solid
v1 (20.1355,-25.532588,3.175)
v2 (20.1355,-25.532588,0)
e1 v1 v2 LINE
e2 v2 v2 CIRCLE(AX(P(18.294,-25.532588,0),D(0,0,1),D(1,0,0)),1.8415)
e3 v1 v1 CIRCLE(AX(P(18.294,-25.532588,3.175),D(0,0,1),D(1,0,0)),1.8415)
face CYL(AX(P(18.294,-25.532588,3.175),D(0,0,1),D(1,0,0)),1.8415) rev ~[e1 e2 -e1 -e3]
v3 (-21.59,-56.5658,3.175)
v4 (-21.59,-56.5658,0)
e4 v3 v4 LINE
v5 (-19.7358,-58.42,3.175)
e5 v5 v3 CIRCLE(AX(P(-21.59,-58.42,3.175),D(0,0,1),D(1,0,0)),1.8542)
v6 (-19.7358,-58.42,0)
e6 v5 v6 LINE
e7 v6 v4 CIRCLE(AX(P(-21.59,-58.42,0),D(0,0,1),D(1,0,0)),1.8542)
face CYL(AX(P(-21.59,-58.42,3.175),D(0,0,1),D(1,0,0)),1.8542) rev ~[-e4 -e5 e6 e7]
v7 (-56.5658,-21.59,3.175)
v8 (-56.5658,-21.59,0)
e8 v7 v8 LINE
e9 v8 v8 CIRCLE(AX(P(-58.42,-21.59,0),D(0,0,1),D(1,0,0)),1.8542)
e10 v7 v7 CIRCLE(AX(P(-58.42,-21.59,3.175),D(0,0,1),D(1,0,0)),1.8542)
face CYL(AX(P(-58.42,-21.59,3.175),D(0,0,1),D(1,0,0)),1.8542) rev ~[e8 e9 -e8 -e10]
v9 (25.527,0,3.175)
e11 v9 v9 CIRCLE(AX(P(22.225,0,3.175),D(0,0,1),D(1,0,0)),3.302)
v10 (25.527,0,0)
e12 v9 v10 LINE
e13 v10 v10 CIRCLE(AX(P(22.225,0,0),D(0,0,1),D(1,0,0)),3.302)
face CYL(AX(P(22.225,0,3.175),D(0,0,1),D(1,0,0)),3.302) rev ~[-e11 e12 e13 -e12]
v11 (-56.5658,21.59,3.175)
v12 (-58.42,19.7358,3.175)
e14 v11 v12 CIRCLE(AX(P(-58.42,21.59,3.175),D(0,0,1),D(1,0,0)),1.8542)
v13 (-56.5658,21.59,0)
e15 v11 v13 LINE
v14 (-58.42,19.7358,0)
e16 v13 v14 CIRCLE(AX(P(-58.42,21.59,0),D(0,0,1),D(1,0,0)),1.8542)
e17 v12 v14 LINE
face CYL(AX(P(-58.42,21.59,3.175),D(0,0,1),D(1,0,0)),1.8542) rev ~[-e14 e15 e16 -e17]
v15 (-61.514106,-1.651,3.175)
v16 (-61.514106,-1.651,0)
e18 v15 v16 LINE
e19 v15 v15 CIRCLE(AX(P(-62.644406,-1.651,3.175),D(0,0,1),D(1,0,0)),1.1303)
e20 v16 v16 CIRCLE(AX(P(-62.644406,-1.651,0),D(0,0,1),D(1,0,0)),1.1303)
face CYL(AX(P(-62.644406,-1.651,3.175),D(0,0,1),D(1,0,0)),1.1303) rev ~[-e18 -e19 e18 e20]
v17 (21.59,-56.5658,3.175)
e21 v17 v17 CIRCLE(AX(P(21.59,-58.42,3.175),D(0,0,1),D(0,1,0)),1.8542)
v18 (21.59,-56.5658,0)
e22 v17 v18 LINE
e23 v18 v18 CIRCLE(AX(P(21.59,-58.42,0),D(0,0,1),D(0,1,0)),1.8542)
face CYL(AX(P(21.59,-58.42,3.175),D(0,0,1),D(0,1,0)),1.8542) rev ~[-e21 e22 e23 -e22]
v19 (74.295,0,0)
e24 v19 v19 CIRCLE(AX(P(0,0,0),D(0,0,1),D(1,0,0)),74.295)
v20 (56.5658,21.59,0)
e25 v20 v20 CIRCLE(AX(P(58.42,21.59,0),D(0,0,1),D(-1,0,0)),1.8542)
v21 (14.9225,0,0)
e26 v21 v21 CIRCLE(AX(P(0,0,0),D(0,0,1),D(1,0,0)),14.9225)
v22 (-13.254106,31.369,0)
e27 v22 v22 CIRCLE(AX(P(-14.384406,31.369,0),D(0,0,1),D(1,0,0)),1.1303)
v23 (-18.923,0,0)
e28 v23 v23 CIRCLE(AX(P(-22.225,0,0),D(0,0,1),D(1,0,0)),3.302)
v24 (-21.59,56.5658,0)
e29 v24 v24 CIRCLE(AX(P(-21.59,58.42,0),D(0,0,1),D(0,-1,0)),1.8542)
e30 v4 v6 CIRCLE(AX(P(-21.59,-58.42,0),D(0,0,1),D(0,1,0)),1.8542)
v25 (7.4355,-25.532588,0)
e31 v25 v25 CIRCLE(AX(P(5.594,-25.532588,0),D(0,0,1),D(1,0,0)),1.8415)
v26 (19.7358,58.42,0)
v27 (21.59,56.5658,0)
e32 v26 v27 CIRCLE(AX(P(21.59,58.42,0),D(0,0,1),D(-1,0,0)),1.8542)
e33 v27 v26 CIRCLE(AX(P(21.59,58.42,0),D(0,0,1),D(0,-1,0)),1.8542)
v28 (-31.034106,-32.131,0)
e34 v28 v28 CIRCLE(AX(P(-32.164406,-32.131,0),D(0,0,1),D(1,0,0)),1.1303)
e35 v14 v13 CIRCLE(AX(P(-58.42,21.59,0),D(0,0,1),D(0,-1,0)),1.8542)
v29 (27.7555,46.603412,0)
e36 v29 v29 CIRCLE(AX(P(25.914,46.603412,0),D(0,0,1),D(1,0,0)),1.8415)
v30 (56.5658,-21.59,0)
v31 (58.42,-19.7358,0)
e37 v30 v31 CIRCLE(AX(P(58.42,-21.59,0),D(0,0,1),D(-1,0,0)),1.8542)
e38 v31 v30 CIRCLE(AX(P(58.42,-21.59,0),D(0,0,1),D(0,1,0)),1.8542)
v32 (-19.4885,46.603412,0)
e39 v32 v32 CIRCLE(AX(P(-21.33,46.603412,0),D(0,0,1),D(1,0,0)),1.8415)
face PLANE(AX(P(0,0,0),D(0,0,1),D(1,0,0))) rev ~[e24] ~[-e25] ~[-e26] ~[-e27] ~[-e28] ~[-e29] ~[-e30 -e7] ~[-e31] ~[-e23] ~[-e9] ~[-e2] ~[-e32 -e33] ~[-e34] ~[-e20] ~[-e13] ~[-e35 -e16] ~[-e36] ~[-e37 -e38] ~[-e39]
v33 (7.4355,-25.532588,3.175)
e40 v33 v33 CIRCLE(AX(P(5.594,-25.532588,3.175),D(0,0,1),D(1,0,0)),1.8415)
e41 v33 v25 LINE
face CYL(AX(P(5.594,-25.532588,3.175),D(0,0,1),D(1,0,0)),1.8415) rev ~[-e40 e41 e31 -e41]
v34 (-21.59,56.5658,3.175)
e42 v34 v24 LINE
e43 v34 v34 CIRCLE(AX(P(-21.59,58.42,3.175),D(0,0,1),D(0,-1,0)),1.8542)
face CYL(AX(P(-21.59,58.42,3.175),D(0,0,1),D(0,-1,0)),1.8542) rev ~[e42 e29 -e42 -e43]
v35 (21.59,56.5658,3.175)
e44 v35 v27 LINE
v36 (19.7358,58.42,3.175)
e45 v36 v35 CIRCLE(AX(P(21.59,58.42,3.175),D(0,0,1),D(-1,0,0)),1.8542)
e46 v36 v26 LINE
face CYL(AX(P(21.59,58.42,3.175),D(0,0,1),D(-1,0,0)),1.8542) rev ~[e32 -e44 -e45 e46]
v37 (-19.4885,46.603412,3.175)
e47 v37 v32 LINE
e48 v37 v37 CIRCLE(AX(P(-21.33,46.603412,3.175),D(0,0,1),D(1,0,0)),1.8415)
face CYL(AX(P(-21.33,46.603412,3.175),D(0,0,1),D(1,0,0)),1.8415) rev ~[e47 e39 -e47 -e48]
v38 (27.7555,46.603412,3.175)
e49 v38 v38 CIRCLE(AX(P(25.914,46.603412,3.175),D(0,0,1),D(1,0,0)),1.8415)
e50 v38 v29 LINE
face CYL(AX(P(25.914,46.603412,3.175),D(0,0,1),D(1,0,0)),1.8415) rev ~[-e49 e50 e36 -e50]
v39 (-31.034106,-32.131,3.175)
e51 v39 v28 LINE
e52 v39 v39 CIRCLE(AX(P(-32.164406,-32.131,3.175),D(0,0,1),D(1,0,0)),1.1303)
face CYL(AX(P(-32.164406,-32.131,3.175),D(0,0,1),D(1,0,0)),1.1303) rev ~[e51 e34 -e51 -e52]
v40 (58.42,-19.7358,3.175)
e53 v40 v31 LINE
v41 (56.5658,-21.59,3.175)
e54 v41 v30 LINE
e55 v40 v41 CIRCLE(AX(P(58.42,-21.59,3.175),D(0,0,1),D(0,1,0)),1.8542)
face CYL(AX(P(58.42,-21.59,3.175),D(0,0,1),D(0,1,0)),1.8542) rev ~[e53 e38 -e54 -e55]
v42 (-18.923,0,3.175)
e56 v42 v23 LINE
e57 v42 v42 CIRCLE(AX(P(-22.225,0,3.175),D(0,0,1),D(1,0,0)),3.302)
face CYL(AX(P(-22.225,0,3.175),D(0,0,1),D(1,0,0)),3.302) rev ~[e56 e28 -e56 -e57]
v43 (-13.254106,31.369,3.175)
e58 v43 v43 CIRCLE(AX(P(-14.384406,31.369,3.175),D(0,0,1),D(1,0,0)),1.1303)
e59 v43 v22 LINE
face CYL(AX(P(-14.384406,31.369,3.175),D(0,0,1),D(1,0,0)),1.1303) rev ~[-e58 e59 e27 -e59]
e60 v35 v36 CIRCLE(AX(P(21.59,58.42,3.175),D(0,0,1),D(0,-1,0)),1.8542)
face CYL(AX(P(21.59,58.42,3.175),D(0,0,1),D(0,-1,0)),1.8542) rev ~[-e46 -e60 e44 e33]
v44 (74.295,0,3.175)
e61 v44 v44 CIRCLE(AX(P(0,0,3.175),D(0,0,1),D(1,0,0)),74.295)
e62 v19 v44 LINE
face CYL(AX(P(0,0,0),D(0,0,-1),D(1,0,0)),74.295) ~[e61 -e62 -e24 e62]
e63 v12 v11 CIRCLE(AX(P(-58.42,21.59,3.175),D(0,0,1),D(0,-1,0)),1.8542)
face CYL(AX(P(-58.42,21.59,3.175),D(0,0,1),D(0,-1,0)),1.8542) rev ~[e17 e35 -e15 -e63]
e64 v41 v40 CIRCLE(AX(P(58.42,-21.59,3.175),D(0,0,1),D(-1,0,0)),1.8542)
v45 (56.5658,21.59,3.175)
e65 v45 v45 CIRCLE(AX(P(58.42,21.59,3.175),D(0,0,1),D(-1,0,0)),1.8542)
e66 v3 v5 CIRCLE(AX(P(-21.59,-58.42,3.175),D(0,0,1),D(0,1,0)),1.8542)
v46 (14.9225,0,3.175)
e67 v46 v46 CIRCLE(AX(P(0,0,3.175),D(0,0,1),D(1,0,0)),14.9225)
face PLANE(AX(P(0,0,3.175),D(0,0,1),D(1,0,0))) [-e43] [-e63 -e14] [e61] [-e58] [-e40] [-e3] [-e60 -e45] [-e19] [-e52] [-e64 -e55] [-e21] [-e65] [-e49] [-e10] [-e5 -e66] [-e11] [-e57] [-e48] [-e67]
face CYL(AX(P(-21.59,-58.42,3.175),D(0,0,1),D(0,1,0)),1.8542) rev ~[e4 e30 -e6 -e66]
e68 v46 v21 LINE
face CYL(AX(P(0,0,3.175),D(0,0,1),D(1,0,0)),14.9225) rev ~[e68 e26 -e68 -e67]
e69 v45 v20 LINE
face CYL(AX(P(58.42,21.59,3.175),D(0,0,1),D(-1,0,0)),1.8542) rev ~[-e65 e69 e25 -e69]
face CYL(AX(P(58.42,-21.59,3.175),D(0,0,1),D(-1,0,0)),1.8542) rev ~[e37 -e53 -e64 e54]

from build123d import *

# Parameters (mm, degrees)
F0_R            = 74.295
F1_DEPTH        = 3.175
F2_R            = 1.8542
F3_DEPTH        = 3.176
F3_COPIES_COUNT = 4
F4_R            = 14.9225
F4_R_2          = 3.302
F5_DEPTH        = 3.176
F6_R            = 1.8415
F7_DEPTH        = 3.176
F8_R            = 1.1303
F9_DEPTH        = 3.176


# Not quite as in the source:
# - a pattern or mirror of a feature is missing from the dataset's text; its kind, count and spacing are read off the source's solid


with BuildPart() as f1:
    # F0 (on Top) → F1 (new body)
    with BuildSketch(Plane.XY):
        Circle(F0_R)
    extrude(amount=F1_DEPTH)

    # F2 (on face) → F3 (cut, through all)
    with BuildSketch(Plane.XY.offset(3.175)):
        with BuildLine():
            ThreePointArc((-58.42, 19.7358), (-57.1088826063, 20.2788826063), (-56.5658, 21.59))
            ThreePointArc((-56.5658, 21.59), (-59.7311173937, 22.9011173937), (-58.42, 19.7358))
        make_face()
        with Locations((-58.42, -21.59)):
            Circle(F2_R)
    f3 = extrude(amount=-F3_DEPTH, mode=Mode.SUBTRACT)

    # F3_copies: F3 ×4 about axis
    f3_copies_axis = Axis((0, 0, 0), (0, 0, 1))
    for i in range(1, F3_COPIES_COUNT):
        add(f3.rotate(f3_copies_axis, i * 360 / F3_COPIES_COUNT), mode=Mode.SUBTRACT)

    # F4 (on face) → F5 (cut, through all)
    with BuildSketch(Plane.XY.offset(3.175)):
        Circle(F4_R)
        with Locations((-22.225, 0)):
            Circle(F4_R_2)
        with Locations((22.225, 0)):
            Circle(F4_R_2)
    extrude(amount=-F5_DEPTH, mode=Mode.SUBTRACT)

    # F6 (on face) → F7 (cut, through all)
    with BuildSketch(Plane.XY.offset(3.175)):
        with Locations((-21.330000012, 46.603412)):
            Circle(F6_R)
        with Locations((25.913999988, 46.603412)):
            Circle(F6_R)
        with Locations((5.593999988, -25.532588)):
            Circle(F6_R)
        with Locations((18.293999988, -25.532588)):
            Circle(F6_R)
    extrude(amount=-F7_DEPTH, mode=Mode.SUBTRACT)

    # F8 (on face) → F9 (cut, through all)
    with BuildSketch(Plane.XY.offset(3.175)):
        with Locations((-14.3844060319, 31.369)):
            Circle(F8_R)
        with Locations((-62.6444060319, -1.651)):
            Circle(F8_R)
        with Locations((-32.1644060319, -32.131)):
            Circle(F8_R)
    extrude(amount=-F9_DEPTH, mode=Mode.SUBTRACT)


solid = f1.part
